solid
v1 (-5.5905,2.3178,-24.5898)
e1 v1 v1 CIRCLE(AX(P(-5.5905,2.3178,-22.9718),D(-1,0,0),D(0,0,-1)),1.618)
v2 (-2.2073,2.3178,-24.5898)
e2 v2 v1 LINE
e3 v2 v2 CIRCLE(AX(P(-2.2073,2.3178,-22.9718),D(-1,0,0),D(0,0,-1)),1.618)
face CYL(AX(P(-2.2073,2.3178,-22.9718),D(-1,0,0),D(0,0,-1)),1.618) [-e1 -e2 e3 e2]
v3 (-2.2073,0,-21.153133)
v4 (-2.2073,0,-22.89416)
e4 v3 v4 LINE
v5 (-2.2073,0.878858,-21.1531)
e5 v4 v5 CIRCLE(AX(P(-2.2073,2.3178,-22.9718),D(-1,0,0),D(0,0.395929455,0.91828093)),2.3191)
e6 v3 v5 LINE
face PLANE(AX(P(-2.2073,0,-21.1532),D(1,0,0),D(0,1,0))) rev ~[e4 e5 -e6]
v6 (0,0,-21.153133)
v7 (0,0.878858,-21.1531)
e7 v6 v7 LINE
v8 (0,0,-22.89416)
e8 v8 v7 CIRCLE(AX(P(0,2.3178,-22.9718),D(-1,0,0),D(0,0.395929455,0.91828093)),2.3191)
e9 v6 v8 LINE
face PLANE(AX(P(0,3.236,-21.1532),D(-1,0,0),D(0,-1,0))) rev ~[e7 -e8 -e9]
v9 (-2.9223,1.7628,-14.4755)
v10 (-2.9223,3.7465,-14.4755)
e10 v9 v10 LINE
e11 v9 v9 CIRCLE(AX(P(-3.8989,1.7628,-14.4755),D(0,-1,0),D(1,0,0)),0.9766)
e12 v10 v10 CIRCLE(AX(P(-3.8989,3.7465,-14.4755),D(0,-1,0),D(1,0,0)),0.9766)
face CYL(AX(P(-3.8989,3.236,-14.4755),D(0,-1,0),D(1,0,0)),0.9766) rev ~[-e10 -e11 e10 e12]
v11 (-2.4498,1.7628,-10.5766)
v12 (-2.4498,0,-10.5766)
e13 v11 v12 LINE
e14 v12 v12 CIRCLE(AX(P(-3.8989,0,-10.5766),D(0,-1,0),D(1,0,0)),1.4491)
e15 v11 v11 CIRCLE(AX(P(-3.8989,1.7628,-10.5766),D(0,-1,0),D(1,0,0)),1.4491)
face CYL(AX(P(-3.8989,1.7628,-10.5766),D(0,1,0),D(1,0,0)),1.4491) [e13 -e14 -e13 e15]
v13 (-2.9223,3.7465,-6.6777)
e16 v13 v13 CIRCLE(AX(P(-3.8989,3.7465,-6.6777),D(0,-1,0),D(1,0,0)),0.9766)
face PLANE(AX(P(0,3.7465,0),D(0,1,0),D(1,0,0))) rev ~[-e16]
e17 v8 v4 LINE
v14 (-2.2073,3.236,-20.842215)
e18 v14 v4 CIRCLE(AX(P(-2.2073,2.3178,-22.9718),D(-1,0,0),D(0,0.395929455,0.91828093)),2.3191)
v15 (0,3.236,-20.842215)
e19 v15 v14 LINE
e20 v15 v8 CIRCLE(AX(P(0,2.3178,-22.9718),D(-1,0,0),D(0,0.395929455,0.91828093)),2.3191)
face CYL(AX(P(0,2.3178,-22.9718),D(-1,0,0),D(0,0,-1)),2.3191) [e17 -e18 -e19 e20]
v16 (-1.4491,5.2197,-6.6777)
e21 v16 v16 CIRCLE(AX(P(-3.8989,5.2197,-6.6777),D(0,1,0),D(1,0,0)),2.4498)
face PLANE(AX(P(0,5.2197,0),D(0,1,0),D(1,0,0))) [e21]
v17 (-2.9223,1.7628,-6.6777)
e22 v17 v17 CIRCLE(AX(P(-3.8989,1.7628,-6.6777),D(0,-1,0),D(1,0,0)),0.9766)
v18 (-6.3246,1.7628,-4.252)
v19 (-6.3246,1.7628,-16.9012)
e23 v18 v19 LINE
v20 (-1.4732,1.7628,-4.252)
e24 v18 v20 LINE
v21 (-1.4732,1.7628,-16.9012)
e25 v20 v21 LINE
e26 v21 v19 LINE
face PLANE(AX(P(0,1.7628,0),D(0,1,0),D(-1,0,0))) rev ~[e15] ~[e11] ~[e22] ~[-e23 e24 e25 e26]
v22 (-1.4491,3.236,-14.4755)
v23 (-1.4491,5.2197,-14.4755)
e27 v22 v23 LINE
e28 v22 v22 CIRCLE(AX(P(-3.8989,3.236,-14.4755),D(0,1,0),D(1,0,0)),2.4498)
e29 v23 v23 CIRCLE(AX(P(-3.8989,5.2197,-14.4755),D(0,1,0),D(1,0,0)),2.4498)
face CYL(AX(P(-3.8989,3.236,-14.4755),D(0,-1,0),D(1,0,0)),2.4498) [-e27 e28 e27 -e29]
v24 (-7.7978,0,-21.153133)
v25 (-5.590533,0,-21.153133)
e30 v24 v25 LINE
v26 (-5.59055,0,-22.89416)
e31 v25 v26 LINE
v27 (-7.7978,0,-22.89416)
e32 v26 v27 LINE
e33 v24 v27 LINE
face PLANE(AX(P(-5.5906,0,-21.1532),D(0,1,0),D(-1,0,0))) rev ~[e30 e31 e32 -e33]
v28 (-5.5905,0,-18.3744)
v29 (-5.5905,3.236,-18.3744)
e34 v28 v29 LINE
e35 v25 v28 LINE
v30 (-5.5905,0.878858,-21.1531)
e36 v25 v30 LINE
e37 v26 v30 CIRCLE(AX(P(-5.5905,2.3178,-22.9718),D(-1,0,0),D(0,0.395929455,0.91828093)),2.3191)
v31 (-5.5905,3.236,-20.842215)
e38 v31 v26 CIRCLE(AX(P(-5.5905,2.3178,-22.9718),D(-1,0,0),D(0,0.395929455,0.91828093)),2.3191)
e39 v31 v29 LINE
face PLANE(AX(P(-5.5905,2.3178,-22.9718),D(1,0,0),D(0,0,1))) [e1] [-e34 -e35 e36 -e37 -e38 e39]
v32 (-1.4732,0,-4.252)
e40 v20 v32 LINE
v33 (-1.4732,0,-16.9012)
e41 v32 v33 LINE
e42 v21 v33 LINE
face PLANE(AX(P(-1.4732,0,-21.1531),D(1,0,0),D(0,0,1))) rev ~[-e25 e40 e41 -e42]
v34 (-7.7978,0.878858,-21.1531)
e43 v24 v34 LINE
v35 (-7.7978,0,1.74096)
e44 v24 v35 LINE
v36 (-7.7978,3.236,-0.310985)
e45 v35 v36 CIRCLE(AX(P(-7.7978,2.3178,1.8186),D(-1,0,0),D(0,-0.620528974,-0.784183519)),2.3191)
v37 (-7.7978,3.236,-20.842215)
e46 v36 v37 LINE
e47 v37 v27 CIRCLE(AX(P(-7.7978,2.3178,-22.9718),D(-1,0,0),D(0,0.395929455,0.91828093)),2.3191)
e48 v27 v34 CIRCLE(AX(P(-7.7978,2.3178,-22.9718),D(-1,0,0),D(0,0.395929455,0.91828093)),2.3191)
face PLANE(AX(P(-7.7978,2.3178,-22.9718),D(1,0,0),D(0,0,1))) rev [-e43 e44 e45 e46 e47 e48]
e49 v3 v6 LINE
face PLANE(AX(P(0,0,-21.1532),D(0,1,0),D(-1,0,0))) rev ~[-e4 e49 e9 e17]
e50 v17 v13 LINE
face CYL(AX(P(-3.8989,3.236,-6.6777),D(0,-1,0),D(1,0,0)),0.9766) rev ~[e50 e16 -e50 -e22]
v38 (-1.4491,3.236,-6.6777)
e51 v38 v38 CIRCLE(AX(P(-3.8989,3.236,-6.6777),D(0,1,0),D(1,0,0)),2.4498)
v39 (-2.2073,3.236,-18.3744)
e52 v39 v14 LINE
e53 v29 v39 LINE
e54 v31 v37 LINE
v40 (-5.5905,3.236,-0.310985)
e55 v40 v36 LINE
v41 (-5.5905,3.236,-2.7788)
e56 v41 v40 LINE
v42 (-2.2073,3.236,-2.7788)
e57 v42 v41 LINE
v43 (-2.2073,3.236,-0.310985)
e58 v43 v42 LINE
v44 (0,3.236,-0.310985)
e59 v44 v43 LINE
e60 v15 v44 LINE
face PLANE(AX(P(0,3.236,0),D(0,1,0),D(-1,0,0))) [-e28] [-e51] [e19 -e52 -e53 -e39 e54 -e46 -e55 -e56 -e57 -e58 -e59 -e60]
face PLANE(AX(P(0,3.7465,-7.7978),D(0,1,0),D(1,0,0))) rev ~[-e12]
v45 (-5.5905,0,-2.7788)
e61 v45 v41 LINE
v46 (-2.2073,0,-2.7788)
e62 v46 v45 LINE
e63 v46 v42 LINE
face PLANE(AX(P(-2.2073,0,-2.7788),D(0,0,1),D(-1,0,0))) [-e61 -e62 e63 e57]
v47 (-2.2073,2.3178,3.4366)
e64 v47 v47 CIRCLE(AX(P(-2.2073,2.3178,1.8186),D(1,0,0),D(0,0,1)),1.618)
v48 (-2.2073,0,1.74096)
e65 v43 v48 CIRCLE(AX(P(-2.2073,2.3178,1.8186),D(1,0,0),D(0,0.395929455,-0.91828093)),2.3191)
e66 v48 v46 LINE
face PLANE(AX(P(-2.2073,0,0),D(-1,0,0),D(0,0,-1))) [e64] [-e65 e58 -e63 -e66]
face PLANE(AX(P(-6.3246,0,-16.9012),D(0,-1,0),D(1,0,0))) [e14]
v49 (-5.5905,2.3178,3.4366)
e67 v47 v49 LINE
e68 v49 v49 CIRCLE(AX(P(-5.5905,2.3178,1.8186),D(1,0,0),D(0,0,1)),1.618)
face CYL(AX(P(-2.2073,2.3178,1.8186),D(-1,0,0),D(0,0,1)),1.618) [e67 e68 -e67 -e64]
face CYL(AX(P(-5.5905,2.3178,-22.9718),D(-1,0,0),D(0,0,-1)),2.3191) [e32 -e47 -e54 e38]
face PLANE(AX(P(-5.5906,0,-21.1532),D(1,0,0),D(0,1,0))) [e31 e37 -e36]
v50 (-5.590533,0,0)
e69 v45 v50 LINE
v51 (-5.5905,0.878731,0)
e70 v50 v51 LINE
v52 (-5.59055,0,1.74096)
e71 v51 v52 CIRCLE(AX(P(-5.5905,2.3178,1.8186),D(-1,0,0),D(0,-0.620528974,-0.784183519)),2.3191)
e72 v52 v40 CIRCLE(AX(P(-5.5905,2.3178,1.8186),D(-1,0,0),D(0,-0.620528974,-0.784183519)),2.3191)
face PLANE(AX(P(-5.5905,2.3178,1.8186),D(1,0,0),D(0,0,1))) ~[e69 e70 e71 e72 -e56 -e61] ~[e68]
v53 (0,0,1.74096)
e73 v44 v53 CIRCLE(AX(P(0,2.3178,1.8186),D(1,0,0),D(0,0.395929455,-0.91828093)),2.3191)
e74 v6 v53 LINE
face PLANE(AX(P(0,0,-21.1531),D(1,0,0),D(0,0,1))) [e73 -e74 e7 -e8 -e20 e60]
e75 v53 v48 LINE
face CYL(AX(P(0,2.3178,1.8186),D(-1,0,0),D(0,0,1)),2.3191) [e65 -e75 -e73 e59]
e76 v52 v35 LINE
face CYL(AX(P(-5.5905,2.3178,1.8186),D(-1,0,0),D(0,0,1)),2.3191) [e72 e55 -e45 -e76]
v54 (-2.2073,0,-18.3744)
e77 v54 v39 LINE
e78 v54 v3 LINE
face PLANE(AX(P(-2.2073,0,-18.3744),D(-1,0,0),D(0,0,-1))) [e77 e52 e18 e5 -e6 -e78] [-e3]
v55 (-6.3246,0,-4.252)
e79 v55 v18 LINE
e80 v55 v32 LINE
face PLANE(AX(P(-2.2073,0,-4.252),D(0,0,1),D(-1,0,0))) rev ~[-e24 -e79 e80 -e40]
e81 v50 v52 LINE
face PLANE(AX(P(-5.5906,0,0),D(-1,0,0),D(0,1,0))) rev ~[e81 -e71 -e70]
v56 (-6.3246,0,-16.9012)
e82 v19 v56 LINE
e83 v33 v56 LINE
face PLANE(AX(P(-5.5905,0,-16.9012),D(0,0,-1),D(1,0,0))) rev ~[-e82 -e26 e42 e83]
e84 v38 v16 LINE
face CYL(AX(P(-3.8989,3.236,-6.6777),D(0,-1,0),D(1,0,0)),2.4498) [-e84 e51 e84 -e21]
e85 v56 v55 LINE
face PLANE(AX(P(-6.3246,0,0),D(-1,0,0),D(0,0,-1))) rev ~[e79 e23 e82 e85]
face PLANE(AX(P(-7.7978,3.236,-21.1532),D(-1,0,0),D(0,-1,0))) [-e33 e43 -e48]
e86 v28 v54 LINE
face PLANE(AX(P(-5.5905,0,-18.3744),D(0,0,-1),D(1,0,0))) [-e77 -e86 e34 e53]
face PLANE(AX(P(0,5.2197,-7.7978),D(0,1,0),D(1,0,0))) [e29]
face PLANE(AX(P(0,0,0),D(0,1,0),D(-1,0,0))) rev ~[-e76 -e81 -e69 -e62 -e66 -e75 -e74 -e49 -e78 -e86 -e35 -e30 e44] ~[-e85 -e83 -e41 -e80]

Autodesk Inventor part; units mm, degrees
ref_plane "YZ Plane" through (0, 0, 0) normal (1, 0, 0) x (0, 1, 0)
sketch "Sketch1" plane through (0, 0, 0) normal (0, 1, 0) x (-1, 0, 0)
  line L0 (0, 0) -> (7.7978, 0) construction
  line L1 (7.7978, 0) -> (7.7978, -21.1531) construction
  line L2 (7.7978, -21.1531) -> (0, -21.1531) construction
  line L3 (0, -21.1531) -> (0, 0) construction
  line L4 (7.7978, -10.5766) -> (7.7978, -2.7788) construction
  line L5 (7.7978, -2.7788) -> (0, -2.7788) construction
  line L6 (0, -2.7788) -> (0, -18.3744) construction
  line L7 (0, -18.3744) -> (7.7978, -18.3744) construction
  line L8 (7.7978, -18.3744) -> (7.7978, -2.7788) construction
  line L9 (7.7978, 0) -> (5.5905, 0) construction
  line L10 (5.5905, 0) -> (5.5905, -2.7788) construction
  line L11 (5.5905, -2.7788) -> (7.7978, -2.7788) construction
  line L12 (7.7978, -2.7788) -> (7.7978, 0) construction
  line L13 (7.7978, -10.5766) -> (0, -10.5766) construction
  line L14 (5.5905, -21.1531) -> (5.5905, -18.3744) construction
  line L15 (3.8989, 0) -> (3.8989, -21.1531) construction
  line L16 (2.2073, 0) -> (2.2073, -2.7788) construction
  line L17 (2.2073, -21.1531) -> (2.2073, -18.3744) construction
  line L18 (7.7978, 0) -> (7.7978, -21.1531)
  line L19 (7.7978, -21.1531) -> (5.5905, -21.1531)
  line L20 (5.5905, -21.1531) -> (5.5905, -18.3744)
  line L21 (5.5905, -18.3744) -> (2.2073, -18.3744)
  line L22 (2.2073, -18.3744) -> (2.2073, -21.1531)
  line L23 (2.2073, -21.1531) -> (0, -21.1531)
  line L24 (0, -21.1531) -> (0, 0)
  line L25 (0, 0) -> (2.2073, 0)
  line L26 (2.2073, 0) -> (2.2073, -2.7788)
  line L27 (2.2073, -2.7788) -> (5.5905, -2.7788)
  line L28 (5.5905, -2.7788) -> (5.5905, 0)
  line L29 (5.5905, 0) -> (7.7978, 0)
  dimension "d0" = 7.7978
  dimension "d1" = 21.1531
  dimension "d2" = 7.7978
  dimension "d3" = 7.7978
  dimension "d4" = 15.5956
  dimension "d5" = 2.2073
extrude "Extrusion1" add sketch "Sketch1" along normal blind 3.236
sketch "Sketch2" plane through (0, 3.236, 0) normal (0, 1, 0) x (1, 0, 0)
  line L0 (0, 0) -> (0, 21.1531) construction
  line L1 (0, 10.5766) -> (-7.7978, 10.5766) construction
  line L2 (-7.7978, 21.1531) -> (-7.7978, 0) construction
  line L3 (0, 10.5766) -> (-3.8989, 10.5766) construction
  line L4 (-3.8989, 10.5766) -> (-3.8989, 6.6777) construction
  line L5 (-3.8989, 6.6777) -> (0, 6.6777) construction
  line L6 (0, 6.6777) -> (0, 10.5766) construction
  circle A0 centre (-3.8989, 6.6777) radius 2.4498
  dimension "d8" = 3.8989
  dimension "d9" = 3.8989
  dimension "d10" = 4.8997
extrude "Extrusion2" add sketch "Sketch2" along normal blind 1.9837
pattern_linear "Rectangular Pattern1" count 2 spacing 7.7978 along (0, 0, -1) of "Extrusion2"
shell "Shell1" thickness 1.4732 removed faces 1 at (-3.335, 0, -7.9773)
sketch "Sketch3" plane through (-6.3246, 1.7628, -16.9012) normal (0, -1, 0) x (1, 0, 0)
  circle A0 centre (2.4257, 10.2235) radius 2.4498 construction
  circle A1 centre (2.4257, 2.4257) radius 2.4498 construction
  line L0 (2.4257, 10.2235) -> (2.4257, 2.4257) construction
  circle A2 centre (2.4257, 6.3246) radius 1.4491
  point P0 (6.3246, 16.9012)
extrude "Extrusion3" add sketch "Sketch3" along normal up to surface (1.7628 mm away)
ref_plane "Work Plane1" through (0, 2.3178, 0) normal (0, -1, 0) x (1, 0, 0)
sketch "Sketch5" plane through (0, 2.3178, 0) normal (0, -1, 0) x (1, 0, 0)
  line L0 (-7.7978, -21.1531) -> (-7.7978, 0) construction
  line L1 (-7.7978, 0) -> (-7.7978, 1.8186) construction
  line L2 (-7.7978, 0) -> (-5.9792, 0) construction
  line L3 (-7.7978, 1.8186) -> (0, 1.8186) construction
  line L4 (0, 1.8186) -> (0, 4.1377) construction
  line L5 (0, 4.1377) -> (-7.7978, 4.1377) construction
  line L6 (-7.7978, 4.1377) -> (-7.7978, 1.8186) construction
  line L7 (-7.7978, 4.1377) -> (-5.5905, 4.1377) construction
  line L8 (-7.7978, 4.1377) -> (-5.5905, 4.1377) construction
  line L9 (-5.5905, 4.1377) -> (-2.2073, 4.1377) construction
  line L10 (-2.2073, 4.1377) -> (-2.2073, 3.4366) construction
  line L11 (-2.2073, 3.4366) -> (-5.5905, 3.4366) construction
  line L12 (-5.5905, 3.4366) -> (-5.5905, 4.1377) construction
  line L13 (-7.7978, 1.8186) -> (0, 1.8186)
  line L14 (0, 1.8186) -> (0, 4.1377)
  line L15 (0, 4.1377) -> (-2.2073, 4.1377)
  line L16 (-2.2073, 4.1377) -> (-2.2073, 3.4366)
  line L17 (-2.2073, 3.4366) -> (-5.5905, 3.4366)
  line L18 (-5.5905, 3.4366) -> (-5.5905, 4.1377)
  line L19 (-5.5905, 4.1377) -> (-7.7978, 4.1377)
  line L20 (-7.7978, 4.1377) -> (-7.7978, 1.8186)
  dimension "d28" = 1.8186
  dimension "d29" = 90
  dimension "d30" = 7.7978
  dimension "d31" = 2.319
  dimension "d32" = 2.2073
  dimension "d33" = 0
  dimension "d34" = 3.3833
  dimension "d35" = 0.701
revolve "Revolution1" add sketch "Sketch5" angle 360 about axis through (-7.7978, 2.3178, 1.8186) along (1, 0, 0)
sketch "Sketch6" plane through (-2.2073, 0, 0) normal (0, 0, 1) x (1, 0, 0)
  line L0 (2.2073, 0) -> (0, 0) projected
  line L1 (0, 0) -> (0, 3.236) projected
  line L2 (2.2073, 0) -> (0, 0)
  line L3 (0, 0) -> (0, 3.236)
  line L4 (0, 3.236) -> (2.2073, 3.236)
  line L5 (2.2073, 3.236) -> (2.2073, 0)
  line L6 (-3.3833, 0) -> (-5.5905, 0) projected
  line L7 (-3.3833, 0) -> (-3.3833, 3.236) projected
  line L8 (-5.5905, 0) -> (-3.3833, 0)
  line L9 (-3.3833, 0) -> (-3.3833, 3.236)
  line L10 (-3.3833, 3.236) -> (-5.5905, 3.236)
  line L11 (-5.5905, 3.236) -> (-5.5905, 0)
extrude "Extrusion4" add sketch "Sketch6" along normal up to surface
ref_plane "Work Plane2" through (-5.5905, 0, -10.5766) normal (0, 0, 1) x (1, 0, 0)
mirror "Mirror1" about plane through (-5.5905, 0, -10.5766) normal (0, 0, 1) of "Revolution1", "Extrusion4"
properties part number "Weird circle things" material "ABS Plastic"
